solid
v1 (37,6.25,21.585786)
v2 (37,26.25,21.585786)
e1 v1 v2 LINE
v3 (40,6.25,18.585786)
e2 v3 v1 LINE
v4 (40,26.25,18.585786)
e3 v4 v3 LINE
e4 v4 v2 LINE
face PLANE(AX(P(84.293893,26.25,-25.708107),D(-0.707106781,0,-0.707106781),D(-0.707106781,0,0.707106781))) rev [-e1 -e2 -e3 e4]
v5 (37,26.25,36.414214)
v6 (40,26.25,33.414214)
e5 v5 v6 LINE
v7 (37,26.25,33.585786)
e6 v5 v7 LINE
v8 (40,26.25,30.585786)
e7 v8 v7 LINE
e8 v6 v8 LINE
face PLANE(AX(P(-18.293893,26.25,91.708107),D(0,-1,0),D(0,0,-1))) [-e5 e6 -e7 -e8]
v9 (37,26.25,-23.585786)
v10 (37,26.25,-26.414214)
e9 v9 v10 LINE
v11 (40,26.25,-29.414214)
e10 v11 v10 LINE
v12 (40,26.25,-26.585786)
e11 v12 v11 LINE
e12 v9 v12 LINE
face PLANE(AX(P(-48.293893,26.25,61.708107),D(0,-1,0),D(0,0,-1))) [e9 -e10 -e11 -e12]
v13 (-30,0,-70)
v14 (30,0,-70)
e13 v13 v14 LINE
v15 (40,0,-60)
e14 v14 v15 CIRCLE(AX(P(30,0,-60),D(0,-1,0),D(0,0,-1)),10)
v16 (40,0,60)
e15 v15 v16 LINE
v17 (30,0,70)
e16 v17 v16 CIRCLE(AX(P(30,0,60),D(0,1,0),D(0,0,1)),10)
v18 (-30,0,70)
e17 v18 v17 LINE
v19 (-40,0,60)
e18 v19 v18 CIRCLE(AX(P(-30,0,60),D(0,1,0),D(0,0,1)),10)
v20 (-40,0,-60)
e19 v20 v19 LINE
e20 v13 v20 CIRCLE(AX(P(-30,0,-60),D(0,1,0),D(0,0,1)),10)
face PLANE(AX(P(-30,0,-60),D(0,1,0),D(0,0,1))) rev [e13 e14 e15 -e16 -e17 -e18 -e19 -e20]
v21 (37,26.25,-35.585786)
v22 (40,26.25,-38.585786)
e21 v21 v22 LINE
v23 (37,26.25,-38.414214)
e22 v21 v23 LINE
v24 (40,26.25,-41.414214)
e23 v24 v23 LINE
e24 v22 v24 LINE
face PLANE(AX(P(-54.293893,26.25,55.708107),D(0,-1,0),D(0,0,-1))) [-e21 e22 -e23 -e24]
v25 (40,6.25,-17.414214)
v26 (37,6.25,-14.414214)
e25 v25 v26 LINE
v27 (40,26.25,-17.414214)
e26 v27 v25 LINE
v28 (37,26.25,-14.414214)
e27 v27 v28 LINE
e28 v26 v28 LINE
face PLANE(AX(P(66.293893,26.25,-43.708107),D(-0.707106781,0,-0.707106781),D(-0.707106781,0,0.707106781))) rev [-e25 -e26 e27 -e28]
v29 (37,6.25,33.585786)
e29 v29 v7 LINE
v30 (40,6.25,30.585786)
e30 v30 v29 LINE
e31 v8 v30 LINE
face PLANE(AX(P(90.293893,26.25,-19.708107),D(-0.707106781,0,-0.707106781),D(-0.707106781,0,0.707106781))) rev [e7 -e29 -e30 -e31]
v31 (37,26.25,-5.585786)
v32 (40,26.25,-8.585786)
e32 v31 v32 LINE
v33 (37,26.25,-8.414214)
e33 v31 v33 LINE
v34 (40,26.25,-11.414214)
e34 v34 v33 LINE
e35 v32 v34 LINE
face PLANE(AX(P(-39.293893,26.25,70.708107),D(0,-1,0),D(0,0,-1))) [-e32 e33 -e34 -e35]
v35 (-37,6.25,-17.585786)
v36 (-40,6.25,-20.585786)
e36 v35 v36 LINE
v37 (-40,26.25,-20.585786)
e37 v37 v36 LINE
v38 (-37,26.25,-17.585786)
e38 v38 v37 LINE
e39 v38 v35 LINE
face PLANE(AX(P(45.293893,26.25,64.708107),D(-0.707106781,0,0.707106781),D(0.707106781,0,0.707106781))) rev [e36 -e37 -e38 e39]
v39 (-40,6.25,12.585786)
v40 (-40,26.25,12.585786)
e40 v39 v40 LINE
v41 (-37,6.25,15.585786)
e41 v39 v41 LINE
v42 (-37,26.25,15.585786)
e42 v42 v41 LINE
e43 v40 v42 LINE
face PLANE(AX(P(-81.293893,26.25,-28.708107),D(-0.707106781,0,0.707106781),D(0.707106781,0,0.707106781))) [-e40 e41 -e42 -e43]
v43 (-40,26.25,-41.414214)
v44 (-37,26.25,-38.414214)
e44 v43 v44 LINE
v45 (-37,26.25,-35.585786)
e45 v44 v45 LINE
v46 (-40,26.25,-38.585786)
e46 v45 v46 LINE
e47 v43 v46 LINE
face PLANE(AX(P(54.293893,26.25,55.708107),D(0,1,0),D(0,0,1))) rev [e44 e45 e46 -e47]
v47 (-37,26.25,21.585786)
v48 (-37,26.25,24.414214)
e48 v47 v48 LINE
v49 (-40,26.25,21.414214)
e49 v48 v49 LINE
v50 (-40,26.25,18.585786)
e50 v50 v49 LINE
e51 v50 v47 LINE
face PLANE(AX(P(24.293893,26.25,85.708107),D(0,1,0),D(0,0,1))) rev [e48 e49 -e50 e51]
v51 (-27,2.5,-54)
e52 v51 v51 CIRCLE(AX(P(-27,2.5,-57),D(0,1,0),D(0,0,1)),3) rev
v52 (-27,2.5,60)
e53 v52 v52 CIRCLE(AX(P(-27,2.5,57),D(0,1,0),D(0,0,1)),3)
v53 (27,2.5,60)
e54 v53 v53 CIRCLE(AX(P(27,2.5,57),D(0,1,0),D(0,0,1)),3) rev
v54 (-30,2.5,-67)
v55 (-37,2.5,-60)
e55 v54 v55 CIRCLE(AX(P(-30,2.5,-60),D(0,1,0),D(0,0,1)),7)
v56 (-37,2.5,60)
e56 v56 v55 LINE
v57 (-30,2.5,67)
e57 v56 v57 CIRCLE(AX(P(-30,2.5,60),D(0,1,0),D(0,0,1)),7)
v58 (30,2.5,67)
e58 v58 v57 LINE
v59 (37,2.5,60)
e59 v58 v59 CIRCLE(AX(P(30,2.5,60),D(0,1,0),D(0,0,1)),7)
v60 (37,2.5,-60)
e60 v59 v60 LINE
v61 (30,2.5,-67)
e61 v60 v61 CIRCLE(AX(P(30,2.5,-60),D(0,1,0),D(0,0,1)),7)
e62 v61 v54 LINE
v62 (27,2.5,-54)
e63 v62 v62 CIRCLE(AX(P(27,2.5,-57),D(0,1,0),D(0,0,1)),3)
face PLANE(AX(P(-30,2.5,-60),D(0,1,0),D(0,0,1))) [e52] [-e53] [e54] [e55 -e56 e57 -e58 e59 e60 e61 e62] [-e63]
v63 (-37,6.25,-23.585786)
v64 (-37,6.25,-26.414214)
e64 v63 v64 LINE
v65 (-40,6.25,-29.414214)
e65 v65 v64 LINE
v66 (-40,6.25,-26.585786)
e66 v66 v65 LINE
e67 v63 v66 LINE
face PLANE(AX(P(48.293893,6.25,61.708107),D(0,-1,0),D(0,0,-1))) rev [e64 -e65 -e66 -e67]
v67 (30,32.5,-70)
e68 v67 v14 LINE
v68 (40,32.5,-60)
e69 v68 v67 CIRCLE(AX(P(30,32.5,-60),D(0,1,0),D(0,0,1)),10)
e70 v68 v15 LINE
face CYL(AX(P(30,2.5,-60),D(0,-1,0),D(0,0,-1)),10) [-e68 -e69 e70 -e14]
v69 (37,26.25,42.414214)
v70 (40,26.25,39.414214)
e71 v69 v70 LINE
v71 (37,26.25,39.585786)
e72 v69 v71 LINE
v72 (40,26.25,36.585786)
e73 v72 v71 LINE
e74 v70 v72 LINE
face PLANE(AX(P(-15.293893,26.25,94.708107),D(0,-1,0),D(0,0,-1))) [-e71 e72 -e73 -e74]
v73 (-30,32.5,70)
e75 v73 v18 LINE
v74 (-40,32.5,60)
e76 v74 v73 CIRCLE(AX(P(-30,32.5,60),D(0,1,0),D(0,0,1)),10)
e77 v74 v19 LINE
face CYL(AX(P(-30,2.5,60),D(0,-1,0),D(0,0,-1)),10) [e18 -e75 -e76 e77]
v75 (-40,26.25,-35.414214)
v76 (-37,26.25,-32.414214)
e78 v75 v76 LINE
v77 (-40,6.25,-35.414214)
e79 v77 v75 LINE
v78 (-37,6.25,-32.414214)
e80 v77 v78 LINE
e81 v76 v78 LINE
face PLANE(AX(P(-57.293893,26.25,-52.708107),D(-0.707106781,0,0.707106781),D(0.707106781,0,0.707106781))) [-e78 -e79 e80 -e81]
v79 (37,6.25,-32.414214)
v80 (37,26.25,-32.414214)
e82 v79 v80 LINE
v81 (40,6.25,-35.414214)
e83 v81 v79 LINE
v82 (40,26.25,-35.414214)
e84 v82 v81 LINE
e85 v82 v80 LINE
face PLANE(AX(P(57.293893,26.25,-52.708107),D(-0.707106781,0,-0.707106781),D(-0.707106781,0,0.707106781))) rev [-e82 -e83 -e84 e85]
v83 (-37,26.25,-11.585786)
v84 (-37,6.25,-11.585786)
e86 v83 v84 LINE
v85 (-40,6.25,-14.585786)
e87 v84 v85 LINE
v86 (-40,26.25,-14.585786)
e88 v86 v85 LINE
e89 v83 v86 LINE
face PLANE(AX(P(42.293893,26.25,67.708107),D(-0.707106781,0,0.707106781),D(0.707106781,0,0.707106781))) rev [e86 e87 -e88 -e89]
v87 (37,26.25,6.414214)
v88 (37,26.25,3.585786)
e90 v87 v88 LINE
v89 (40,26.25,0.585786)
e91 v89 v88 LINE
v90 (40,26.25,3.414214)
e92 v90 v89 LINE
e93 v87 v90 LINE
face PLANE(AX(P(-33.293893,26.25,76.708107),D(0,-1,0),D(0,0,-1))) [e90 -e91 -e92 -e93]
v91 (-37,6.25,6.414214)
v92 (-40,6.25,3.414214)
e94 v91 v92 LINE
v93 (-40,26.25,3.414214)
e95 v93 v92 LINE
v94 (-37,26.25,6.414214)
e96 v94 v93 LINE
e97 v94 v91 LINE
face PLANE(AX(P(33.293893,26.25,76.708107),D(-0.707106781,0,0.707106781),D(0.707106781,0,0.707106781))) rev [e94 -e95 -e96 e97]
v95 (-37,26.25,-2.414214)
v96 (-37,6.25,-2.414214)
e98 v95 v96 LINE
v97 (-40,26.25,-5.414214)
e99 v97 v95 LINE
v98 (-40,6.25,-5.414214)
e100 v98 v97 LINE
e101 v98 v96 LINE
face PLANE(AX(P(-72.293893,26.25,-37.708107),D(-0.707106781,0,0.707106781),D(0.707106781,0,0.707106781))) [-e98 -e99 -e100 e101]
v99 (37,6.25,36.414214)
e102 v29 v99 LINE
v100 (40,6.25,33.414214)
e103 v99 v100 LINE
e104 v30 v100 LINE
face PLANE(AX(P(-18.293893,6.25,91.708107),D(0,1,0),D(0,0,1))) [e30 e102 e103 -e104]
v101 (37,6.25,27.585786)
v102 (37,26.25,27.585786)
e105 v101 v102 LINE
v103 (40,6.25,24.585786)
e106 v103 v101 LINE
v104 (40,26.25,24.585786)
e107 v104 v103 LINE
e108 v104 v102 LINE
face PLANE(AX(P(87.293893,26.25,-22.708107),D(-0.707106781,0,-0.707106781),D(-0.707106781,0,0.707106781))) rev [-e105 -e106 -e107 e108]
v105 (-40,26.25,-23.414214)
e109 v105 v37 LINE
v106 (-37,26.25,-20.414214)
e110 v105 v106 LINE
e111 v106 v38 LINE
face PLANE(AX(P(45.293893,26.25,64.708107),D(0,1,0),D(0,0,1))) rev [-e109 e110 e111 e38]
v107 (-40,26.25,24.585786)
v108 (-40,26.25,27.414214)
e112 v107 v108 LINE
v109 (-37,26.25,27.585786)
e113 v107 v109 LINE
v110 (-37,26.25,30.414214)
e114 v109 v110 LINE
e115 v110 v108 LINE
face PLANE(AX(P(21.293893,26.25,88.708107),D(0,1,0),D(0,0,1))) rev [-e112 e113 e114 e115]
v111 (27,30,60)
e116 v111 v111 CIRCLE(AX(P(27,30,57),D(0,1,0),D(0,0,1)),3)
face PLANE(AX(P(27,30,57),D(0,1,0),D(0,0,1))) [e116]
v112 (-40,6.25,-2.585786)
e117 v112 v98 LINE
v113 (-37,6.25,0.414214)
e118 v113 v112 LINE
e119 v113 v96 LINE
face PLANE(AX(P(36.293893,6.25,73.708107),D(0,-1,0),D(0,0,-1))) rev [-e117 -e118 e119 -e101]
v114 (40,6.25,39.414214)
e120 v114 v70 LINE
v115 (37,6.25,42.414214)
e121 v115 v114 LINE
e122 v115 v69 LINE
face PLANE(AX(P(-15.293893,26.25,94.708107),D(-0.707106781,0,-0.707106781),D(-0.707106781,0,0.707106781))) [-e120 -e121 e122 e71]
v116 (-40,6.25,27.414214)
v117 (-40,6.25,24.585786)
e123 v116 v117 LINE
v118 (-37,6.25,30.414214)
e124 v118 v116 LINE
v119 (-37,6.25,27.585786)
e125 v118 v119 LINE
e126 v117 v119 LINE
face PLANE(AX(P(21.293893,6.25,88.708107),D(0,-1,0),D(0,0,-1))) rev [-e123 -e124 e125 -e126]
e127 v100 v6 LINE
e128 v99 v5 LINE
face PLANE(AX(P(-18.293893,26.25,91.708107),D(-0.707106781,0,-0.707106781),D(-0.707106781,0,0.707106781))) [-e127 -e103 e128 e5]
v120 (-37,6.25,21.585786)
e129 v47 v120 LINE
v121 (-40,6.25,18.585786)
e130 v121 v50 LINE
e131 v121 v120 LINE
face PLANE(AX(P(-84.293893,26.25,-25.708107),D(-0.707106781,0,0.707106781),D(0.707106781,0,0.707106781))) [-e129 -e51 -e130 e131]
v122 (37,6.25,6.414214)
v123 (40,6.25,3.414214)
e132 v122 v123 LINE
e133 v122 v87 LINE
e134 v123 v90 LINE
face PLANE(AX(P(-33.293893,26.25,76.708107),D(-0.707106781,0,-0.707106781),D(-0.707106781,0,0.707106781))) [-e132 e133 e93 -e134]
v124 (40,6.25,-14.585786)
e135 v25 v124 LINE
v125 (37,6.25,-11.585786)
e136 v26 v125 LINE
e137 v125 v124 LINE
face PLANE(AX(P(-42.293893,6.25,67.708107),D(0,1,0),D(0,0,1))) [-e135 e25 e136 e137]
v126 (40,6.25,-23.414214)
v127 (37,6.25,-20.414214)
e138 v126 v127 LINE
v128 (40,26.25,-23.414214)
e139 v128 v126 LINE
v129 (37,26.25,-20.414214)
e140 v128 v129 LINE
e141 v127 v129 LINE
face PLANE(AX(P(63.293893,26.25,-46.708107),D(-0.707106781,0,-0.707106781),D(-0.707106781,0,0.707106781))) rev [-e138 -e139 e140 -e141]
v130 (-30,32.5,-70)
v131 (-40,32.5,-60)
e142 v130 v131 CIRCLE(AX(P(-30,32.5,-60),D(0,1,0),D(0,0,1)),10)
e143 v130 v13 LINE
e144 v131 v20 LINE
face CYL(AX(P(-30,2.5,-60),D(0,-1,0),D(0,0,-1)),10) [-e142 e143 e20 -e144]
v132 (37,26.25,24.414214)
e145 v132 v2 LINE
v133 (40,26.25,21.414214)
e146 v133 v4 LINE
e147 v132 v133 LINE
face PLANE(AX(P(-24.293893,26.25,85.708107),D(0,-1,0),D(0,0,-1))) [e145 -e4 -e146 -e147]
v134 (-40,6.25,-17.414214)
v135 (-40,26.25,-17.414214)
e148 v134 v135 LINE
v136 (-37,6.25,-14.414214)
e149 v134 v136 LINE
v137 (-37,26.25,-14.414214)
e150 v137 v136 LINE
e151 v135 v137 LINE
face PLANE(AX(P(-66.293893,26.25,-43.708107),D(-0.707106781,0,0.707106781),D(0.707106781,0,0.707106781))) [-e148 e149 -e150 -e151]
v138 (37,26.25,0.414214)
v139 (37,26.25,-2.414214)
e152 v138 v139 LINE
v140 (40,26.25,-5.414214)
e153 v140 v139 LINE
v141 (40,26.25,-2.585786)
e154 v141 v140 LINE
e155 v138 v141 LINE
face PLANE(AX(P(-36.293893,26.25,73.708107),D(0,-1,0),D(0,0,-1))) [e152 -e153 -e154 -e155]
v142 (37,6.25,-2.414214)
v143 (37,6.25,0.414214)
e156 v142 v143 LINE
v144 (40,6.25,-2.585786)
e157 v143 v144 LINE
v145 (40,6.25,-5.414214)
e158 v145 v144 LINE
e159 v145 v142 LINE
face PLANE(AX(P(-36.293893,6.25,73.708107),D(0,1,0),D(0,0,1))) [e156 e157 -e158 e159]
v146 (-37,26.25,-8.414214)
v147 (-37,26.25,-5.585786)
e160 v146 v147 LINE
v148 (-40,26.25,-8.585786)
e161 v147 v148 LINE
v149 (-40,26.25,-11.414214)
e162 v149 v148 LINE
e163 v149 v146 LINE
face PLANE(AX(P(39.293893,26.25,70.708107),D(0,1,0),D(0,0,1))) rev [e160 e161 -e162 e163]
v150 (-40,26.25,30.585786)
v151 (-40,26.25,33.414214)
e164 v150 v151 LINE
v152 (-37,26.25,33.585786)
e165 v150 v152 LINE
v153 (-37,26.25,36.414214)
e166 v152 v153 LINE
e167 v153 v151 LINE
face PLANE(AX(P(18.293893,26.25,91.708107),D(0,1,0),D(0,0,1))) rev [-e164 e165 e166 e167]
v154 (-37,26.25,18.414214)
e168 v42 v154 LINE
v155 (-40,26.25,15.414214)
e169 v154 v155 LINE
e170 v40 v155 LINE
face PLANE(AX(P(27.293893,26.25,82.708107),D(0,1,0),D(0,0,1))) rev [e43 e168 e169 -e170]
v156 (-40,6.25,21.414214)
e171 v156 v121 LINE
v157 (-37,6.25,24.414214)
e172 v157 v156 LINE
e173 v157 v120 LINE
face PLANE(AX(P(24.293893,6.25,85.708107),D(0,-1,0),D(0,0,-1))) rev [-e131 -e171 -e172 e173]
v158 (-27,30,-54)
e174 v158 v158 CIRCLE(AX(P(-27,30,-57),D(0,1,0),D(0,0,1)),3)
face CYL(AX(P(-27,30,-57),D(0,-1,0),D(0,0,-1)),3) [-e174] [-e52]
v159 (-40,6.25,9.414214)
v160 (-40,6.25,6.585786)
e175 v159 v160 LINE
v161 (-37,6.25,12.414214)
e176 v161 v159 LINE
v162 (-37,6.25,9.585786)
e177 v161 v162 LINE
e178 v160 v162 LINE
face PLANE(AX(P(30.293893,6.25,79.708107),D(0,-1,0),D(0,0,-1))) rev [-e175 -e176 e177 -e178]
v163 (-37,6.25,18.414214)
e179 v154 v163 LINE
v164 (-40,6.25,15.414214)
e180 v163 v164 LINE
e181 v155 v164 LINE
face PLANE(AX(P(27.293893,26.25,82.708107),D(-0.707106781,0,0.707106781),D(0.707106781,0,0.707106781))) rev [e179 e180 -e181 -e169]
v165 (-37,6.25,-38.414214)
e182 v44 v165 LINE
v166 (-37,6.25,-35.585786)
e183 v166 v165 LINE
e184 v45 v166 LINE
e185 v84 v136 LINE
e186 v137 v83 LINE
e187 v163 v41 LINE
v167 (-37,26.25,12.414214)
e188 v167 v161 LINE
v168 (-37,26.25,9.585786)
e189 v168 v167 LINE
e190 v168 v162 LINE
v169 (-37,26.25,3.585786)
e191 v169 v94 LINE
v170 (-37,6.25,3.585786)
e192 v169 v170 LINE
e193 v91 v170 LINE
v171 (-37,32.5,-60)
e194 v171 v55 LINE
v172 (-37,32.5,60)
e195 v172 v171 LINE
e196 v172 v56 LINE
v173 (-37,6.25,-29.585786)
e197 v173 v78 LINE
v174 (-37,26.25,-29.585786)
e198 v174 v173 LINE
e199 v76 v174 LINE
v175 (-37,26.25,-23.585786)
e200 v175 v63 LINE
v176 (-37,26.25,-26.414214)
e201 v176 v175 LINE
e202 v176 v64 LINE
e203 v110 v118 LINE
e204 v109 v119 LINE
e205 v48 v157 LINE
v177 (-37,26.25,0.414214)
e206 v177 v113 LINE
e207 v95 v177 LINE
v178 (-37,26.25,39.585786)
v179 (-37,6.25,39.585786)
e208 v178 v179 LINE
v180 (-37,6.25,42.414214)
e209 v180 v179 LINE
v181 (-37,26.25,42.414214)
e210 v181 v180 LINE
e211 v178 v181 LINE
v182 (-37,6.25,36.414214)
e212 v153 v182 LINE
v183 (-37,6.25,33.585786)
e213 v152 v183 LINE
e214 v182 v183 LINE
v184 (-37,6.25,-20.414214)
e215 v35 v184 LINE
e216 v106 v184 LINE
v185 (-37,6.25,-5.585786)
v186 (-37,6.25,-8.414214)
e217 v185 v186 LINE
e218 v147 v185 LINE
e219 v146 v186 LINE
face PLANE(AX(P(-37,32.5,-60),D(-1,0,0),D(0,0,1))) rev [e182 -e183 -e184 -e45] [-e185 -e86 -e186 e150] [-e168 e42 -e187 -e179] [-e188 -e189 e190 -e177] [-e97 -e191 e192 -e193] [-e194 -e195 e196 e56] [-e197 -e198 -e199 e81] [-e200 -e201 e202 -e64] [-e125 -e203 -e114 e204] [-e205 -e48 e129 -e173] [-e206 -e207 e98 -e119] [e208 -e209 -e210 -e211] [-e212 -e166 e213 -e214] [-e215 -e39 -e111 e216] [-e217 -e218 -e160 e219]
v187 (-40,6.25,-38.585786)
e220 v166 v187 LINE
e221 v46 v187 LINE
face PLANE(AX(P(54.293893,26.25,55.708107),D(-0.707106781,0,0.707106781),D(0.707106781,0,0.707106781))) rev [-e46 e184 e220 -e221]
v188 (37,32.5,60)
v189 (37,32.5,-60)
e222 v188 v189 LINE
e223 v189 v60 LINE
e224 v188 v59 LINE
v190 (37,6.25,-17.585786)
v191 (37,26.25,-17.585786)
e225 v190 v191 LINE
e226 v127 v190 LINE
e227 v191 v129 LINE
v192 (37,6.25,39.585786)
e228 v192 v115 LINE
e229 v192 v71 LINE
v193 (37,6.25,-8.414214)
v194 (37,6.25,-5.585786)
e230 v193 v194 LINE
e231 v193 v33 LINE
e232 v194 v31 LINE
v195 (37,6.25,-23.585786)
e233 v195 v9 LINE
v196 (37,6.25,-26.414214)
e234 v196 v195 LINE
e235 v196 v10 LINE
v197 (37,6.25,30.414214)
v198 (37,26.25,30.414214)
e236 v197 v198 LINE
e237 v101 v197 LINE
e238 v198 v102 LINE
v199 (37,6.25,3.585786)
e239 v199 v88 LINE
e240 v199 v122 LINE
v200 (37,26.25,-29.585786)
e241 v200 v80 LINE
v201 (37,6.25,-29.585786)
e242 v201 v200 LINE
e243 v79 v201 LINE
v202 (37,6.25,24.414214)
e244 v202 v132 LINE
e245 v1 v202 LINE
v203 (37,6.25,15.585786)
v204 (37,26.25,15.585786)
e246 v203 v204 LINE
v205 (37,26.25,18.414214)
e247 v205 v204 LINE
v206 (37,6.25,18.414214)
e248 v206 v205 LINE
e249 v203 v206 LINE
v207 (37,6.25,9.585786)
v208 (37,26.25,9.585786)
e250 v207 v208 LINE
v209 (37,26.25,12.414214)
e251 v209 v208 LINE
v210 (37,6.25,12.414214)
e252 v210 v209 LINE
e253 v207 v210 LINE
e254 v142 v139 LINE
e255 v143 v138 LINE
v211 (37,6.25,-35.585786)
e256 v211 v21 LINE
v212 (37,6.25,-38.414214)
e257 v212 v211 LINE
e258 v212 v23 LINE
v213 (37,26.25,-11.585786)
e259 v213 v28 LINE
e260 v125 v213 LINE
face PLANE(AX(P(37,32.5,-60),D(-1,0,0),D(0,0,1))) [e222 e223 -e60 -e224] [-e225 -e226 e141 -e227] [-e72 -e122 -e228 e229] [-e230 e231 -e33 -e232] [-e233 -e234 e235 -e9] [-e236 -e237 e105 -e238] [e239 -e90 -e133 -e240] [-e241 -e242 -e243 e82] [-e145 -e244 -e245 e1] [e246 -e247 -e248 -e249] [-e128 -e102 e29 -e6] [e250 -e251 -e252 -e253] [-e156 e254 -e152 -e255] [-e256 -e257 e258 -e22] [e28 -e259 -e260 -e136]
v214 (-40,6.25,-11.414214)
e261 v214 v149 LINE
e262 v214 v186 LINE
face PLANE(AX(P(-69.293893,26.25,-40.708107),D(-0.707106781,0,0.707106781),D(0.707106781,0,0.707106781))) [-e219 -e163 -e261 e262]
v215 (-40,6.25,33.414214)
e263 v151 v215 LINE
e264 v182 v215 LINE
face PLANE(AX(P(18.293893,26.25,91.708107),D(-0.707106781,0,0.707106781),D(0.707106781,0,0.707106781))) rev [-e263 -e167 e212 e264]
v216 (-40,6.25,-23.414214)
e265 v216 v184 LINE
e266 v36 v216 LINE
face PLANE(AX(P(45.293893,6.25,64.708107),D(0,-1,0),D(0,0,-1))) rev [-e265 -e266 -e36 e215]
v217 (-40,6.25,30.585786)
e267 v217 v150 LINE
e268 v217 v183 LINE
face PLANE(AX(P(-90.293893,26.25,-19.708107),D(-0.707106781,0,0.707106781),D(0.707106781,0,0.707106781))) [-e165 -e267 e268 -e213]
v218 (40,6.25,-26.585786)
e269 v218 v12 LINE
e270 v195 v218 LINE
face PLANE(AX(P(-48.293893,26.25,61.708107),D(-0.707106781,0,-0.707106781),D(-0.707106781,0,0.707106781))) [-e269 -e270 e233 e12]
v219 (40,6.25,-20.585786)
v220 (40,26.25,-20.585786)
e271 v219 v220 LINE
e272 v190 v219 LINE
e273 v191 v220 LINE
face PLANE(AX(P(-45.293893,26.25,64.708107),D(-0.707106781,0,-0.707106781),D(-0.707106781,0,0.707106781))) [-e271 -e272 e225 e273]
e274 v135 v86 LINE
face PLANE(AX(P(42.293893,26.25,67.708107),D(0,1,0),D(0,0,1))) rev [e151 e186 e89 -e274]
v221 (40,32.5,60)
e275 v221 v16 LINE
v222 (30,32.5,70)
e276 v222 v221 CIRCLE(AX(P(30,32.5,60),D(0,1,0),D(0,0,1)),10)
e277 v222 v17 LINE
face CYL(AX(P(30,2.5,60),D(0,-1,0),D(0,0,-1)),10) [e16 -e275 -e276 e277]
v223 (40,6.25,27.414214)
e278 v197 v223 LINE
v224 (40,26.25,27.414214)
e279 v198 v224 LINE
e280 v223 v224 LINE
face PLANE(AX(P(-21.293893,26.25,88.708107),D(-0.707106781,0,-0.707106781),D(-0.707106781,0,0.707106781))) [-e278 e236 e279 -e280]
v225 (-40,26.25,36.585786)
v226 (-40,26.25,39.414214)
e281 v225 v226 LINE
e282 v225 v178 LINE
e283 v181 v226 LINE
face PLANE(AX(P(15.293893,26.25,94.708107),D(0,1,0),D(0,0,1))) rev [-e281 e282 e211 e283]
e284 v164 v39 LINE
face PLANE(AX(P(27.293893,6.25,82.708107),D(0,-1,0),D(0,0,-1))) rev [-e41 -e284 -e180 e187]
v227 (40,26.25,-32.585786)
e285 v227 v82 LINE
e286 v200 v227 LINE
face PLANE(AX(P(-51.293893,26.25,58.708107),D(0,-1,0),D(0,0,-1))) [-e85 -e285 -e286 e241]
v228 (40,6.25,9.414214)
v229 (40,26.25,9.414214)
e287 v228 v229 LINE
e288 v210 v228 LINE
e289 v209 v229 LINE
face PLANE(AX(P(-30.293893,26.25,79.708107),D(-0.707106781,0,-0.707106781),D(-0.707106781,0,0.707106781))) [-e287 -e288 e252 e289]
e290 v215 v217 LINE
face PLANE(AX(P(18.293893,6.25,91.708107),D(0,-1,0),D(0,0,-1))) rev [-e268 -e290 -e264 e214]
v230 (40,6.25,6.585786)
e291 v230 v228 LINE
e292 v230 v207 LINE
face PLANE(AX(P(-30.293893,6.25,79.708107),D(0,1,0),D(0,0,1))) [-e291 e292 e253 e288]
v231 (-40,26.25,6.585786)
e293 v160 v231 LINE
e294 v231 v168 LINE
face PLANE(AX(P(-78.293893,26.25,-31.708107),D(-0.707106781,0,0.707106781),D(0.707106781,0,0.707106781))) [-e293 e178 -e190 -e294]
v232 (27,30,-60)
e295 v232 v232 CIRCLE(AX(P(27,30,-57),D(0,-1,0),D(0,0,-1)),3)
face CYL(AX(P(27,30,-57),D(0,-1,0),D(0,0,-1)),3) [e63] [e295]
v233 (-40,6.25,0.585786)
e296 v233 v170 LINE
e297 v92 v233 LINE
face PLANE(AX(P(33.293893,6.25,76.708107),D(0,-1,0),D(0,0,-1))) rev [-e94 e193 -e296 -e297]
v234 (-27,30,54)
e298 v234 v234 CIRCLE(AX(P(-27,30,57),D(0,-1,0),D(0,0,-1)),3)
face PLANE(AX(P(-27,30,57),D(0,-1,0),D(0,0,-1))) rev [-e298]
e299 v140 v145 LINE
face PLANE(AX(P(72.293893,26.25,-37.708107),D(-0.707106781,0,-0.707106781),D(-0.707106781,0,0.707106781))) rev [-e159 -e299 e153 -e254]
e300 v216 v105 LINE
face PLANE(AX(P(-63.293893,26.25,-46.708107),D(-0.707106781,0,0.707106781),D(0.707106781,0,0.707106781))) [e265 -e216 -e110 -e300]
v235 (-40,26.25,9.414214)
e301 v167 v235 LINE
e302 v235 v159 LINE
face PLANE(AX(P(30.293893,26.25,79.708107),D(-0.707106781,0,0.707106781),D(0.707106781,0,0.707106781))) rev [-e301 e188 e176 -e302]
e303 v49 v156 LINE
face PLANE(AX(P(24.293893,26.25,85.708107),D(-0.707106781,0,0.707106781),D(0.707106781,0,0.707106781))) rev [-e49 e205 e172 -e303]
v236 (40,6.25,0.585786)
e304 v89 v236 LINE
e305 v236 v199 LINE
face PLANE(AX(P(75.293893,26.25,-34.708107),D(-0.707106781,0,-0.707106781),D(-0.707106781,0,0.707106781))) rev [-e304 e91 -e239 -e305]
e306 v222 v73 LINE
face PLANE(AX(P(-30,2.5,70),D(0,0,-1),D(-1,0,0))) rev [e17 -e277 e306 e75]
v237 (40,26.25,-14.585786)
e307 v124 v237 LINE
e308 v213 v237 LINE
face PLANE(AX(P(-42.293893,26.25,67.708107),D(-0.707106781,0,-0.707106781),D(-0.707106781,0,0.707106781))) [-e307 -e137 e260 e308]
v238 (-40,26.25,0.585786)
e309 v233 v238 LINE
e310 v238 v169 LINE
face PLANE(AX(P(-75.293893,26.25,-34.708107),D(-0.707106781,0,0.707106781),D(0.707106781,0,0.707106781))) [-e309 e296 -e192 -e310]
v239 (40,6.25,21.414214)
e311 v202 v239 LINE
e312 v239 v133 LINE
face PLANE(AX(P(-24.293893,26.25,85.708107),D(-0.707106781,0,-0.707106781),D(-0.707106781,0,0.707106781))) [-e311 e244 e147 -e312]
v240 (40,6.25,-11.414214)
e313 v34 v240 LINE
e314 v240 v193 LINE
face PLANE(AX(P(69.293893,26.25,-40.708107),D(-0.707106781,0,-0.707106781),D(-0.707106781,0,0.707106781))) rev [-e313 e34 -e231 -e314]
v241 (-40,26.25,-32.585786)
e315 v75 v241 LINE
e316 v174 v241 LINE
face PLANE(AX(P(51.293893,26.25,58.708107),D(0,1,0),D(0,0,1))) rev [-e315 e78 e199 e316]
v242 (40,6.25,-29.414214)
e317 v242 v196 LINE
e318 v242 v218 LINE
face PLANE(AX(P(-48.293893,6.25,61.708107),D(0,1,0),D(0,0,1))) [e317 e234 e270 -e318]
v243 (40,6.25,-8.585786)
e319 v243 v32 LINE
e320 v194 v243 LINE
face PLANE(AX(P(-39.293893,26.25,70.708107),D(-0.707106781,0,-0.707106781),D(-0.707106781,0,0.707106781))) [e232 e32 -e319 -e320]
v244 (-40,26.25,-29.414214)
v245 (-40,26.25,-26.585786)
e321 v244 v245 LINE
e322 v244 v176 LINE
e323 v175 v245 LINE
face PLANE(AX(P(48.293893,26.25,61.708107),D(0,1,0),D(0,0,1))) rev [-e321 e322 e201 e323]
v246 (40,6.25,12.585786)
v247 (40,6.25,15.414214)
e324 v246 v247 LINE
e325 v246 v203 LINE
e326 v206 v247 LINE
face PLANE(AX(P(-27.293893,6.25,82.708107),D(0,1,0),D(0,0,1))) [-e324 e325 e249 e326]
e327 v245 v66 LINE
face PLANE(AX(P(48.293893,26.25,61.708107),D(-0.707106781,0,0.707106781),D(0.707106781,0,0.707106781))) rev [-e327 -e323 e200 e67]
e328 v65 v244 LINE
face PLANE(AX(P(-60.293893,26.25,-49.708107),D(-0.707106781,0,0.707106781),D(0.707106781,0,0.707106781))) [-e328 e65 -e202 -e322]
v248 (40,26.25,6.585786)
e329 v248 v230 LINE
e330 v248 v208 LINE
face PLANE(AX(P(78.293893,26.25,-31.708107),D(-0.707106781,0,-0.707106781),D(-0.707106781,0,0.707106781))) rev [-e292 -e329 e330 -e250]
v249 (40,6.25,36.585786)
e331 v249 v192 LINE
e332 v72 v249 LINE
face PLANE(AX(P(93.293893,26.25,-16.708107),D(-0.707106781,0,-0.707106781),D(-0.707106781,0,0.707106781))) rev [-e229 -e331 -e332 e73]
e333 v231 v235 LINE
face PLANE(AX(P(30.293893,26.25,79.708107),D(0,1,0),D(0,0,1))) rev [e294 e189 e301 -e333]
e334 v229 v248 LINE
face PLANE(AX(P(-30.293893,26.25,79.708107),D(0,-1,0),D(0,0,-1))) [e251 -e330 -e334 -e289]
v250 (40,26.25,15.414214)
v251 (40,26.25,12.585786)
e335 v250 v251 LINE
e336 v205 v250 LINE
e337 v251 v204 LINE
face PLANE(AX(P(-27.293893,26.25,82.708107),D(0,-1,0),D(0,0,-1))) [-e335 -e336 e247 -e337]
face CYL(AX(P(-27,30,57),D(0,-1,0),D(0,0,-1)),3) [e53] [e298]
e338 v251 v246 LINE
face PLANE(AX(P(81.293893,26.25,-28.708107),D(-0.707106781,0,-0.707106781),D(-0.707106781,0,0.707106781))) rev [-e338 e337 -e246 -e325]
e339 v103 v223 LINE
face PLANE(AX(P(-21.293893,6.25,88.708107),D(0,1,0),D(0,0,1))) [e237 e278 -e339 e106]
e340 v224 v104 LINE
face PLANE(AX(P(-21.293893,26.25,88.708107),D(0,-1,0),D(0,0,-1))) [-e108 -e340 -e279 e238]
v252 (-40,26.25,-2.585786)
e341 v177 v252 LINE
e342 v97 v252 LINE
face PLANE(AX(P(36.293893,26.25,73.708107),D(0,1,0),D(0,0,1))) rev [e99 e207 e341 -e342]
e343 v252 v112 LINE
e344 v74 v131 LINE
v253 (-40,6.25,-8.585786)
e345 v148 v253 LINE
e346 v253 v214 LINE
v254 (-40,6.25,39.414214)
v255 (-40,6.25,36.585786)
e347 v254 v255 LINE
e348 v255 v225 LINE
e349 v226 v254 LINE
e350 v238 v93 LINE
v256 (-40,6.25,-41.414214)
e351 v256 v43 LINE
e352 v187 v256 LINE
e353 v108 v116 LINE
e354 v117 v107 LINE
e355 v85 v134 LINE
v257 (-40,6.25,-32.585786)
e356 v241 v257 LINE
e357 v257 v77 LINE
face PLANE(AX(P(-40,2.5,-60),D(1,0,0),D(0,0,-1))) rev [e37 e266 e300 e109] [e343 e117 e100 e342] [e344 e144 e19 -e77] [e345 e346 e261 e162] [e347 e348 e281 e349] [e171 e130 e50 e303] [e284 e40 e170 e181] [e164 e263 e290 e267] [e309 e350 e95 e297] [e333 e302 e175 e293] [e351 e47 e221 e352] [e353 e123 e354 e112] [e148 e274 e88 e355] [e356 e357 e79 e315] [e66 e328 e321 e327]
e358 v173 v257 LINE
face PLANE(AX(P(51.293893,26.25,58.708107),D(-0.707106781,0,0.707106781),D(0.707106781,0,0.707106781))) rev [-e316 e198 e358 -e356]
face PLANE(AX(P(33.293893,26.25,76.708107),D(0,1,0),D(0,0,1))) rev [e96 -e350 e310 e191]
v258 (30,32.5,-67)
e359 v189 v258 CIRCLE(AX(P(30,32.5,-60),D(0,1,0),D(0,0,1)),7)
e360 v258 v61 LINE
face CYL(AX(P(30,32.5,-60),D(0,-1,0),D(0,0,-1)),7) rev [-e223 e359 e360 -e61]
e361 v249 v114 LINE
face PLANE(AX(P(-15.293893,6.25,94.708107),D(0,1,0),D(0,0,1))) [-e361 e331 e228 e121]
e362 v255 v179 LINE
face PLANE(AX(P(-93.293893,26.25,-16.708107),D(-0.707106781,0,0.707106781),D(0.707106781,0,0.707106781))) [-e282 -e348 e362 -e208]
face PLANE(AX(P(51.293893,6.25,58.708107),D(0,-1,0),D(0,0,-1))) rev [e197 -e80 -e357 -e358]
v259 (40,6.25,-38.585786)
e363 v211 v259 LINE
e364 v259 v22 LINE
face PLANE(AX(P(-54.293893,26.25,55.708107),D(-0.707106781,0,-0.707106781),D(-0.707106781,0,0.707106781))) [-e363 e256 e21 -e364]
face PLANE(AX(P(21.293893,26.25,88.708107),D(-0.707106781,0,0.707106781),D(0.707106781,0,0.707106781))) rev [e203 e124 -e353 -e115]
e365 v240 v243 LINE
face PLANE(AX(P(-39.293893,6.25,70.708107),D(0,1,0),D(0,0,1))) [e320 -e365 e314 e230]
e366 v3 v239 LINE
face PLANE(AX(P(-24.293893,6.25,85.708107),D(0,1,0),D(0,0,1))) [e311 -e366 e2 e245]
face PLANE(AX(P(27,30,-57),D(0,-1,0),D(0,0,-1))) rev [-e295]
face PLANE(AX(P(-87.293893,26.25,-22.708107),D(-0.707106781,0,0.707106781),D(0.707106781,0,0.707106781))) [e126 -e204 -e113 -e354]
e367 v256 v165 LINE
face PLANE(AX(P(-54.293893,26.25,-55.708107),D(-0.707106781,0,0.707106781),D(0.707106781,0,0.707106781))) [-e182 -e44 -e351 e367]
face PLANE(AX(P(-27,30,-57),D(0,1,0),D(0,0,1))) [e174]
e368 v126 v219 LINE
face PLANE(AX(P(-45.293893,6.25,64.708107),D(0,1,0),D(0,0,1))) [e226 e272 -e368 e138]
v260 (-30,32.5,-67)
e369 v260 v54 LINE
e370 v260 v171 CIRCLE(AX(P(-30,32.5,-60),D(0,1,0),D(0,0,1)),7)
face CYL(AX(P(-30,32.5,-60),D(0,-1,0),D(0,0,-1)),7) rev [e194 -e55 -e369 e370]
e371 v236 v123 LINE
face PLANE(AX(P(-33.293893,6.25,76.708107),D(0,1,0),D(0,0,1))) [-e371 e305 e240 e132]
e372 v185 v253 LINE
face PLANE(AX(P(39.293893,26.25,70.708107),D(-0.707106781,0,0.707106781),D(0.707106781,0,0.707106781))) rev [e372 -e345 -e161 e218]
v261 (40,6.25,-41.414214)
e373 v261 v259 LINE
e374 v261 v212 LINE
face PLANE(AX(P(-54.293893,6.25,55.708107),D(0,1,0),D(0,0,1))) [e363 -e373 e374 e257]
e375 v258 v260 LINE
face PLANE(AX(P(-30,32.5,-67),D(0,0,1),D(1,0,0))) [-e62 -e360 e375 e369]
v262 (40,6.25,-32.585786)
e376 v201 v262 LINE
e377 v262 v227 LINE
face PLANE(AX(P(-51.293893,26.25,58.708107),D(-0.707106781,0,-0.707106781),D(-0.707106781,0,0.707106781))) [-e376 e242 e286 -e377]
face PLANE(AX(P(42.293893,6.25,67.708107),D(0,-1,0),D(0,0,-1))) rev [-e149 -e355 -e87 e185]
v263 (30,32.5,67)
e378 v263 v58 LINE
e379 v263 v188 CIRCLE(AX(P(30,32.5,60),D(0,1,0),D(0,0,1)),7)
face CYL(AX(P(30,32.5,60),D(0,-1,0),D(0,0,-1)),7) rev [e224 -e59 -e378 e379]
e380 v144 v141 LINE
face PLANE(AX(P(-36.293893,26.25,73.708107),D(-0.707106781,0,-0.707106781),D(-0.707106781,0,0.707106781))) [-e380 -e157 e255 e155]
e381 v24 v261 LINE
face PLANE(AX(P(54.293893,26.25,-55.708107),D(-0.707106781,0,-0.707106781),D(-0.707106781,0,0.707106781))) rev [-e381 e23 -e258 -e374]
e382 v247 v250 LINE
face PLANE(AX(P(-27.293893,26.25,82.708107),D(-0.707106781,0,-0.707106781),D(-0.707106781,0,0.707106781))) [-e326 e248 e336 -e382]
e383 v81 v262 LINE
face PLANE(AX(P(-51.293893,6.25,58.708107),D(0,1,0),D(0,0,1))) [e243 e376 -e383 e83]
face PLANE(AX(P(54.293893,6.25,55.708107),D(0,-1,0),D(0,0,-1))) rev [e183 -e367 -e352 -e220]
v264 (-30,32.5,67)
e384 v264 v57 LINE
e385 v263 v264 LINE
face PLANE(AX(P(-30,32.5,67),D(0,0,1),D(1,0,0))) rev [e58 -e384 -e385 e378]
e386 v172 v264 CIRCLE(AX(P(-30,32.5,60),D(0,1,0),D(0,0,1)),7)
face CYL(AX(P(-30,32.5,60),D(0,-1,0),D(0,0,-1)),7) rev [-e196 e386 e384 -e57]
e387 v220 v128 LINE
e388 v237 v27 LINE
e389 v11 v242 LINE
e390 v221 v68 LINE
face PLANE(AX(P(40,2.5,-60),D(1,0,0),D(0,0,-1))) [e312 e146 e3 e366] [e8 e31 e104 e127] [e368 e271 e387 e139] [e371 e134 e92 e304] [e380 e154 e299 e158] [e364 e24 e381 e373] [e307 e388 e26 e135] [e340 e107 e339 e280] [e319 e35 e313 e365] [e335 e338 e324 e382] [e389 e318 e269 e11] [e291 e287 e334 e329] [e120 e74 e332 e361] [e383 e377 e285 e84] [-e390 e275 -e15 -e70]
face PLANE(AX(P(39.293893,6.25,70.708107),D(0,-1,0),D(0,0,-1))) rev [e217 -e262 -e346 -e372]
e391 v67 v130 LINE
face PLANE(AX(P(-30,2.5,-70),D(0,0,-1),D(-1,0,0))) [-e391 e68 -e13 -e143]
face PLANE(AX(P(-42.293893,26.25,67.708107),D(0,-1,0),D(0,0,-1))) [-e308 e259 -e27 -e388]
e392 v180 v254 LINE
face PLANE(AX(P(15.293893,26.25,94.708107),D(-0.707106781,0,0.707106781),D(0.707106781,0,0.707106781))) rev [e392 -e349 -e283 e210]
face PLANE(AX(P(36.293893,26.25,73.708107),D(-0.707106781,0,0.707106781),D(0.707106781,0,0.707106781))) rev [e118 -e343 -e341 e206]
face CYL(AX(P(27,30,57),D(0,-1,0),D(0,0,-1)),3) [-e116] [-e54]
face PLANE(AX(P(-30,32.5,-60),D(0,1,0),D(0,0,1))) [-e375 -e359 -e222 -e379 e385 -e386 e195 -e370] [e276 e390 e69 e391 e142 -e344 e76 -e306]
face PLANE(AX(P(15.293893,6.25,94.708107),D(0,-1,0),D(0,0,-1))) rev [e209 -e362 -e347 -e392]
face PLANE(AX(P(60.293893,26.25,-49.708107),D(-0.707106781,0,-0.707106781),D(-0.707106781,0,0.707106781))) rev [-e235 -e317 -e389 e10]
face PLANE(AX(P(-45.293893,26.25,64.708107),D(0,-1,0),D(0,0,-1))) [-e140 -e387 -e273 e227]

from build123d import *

# Parameters (mm, degrees)
BOSS_EXTRUDE1_DEPTH            = 2.5
BOSS_EXTRUDE2_START            = 2.5
BOSS_EXTRUDE2_DEPTH            = 30
SKETCH1_5_R                    = 3
BOSS_EXTRUDE4_DEPTH            = 30
CUT_EXTRUDE3_REACH             = 134.823
SKETCH8_W                      = 2
SKETCH8_H                      = 20
CUT_EXTRUDE3_DIRECTION_2_REACH = 134.823
LPATTERN1_START                = 6.25
LPATTERN1_DEPTH                = 20


# Read off the part's stored shape, not the designer's step: LPattern1
with BuildPart() as part:
    # Sketch1 → Boss-Extrude1 (new body)
    with BuildSketch(Plane(origin=(0, 0, 0), x_dir=(1, 0, 0), z_dir=(0, 1, 0))):
        with BuildLine():
            Line((-30, 70), (30, 70))
            ThreePointArc((30, 70), (37.071067812, 67.071067812), (40, 60))
            Line((40, 60), (40, -60))
            ThreePointArc((40, -60), (37.071067812, -67.071067812), (30, -70))
            Line((30, -70), (-30, -70))
            ThreePointArc((-30, -70), (-37.071067812, -67.071067812), (-40, -60))
            Line((-40, -60), (-40, 60))
            ThreePointArc((-40, 60), (-37.071067812, 67.071067812), (-30, 70))
        make_face()
    extrude(amount=BOSS_EXTRUDE1_DEPTH)

    # Sketch1<3> → Boss-Extrude2 (add)
    with BuildSketch(Plane(origin=(0, 0, 0), x_dir=(1, 0, 0), z_dir=(0, 1, 0)).offset(BOSS_EXTRUDE2_START)):
        with BuildLine():
            Line((-30, 70), (30, 70))
            ThreePointArc((30, 70), (37.071067812, 67.071067812), (40, 60))
            Line((40, 60), (40, -60))
            ThreePointArc((40, -60), (37.071067812, -67.071067812), (30, -70))
            Line((30, -70), (-30, -70))
            ThreePointArc((-30, -70), (-37.071067812, -67.071067812), (-40, -60))
            Line((-40, -60), (-40, 60))
            ThreePointArc((-40, 60), (-37.071067812, 67.071067812), (-30, 70))
        make_face()
        with BuildLine():
            Line((-37, 60), (-37, -60))
            ThreePointArc((-37, -60), (-34.949747468, -64.949747468), (-30, -67))
            Line((-30, -67), (30, -67))
            ThreePointArc((30, -67), (34.949747468, -64.949747468), (37, -60))
            Line((37, -60), (37, 60))
            ThreePointArc((37, 60), (34.949747468, 64.949747468), (30, 67))
            Line((30, 67), (-30, 67))
            ThreePointArc((-30, 67), (-34.949747468, 64.949747468), (-37, 60))
        make_face(mode=Mode.SUBTRACT)
    extrude(amount=BOSS_EXTRUDE2_DEPTH)

    # Sketch1<5> → Boss-Extrude4 (add)
    with BuildSketch(Plane(origin=(0, 0, 0), x_dir=(1, 0, 0), z_dir=(0, 1, 0))):
        with Locations(Location((27, -57, 0), (0, 0, 270))):
            Circle(SKETCH1_5_R)
        with Locations(Location((-27, -57, 0), (0, 0, 90))):
            Circle(SKETCH1_5_R)
        with Locations(Location((-27, 57, 0), (0, 0, 270))):
            Circle(SKETCH1_5_R)
        with Locations(Location((27, 57, 0), (0, 0, 90))):
            Circle(SKETCH1_5_R)
    extrude(amount=BOSS_EXTRUDE4_DEPTH)

    # Sketch8 → Cut-Extrude3 (cut, up to next)
    with BuildSketch(Plane(origin=(37, 16.25, -37), x_dir=(0.7071067811865538, 0, 0.7071067811865412), z_dir=(-0.7071067811865412, 0, 0.7071067811865538)), mode=Mode.PRIVATE) as cut_extrude3_sk1:
        Rectangle(SKETCH8_W, SKETCH8_H)
    cut_extrude3_tool1 = extrude(cut_extrude3_sk1.sketch, amount=-CUT_EXTRUDE3_REACH, mode=Mode.PRIVATE) & part.part
    cut_extrude3 = cut_extrude3_tool1.solids().sort_by_distance((37, 16.25, -37))[0]
    add(cut_extrude3, mode=Mode.SUBTRACT)

    # Sketch8 → Cut-Extrude3 direction 2 (cut, up to next)
    with BuildSketch(Plane(origin=(37, 16.25, -37), x_dir=(0.7071067811865538, 0, 0.7071067811865412), z_dir=(-0.7071067811865412, 0, 0.7071067811865538)), mode=Mode.PRIVATE) as cut_extrude3_direction_2_sk1:
        Rectangle(SKETCH8_W, SKETCH8_H)
    cut_extrude3_direction_2_tool1 = extrude(cut_extrude3_direction_2_sk1.sketch, amount=CUT_EXTRUDE3_DIRECTION_2_REACH, mode=Mode.PRIVATE) & part.part
    cut_extrude3_direction_2 = cut_extrude3_direction_2_tool1.solids().sort_by_distance((37, 16.25, -37))[0]
    add(cut_extrude3_direction_2, mode=Mode.SUBTRACT)

    # LPattern1 outline → LPattern1 (cut)
    with BuildSketch(Plane(origin=(0, 0, 0), x_dir=(1, 0, 0), z_dir=(0, 1, 0)).offset(LPATTERN1_START)):
        Polygon((37, -42.414213562), (40, -39.414213562), (40, -36.585786438), (37, -39.585786438), align=None)
        Polygon((37, -36.414213562), (40, -33.414213562), (40, -30.585786438), (37, -33.585786438), align=None)
        Polygon((37, -30.414213562), (40, -27.414213562), (40, -24.585786438), (37, -27.585786438), align=None)
        Polygon((37, -24.414213562), (40, -21.414213562), (40, -18.585786438), (37, -21.585786438), align=None)
        Polygon((37, -18.414213562), (40, -15.414213562), (40, -12.585786438), (37, -15.585786438), align=None)
        Polygon((37, -12.414213562), (40, -9.414213562), (40, -6.585786438), (37, -9.585786438), align=None)
        Polygon((37, -6.414213562), (40, -3.414213562), (40, -0.585786438), (37, -3.585786438), align=None)
        Polygon((37, -0.414213562), (40, 2.585786438), (40, 5.414213562), (37, 2.414213562), align=None)
        Polygon((37, 5.585786438), (40, 8.585786438), (40, 11.414213562), (37, 8.414213562), align=None)
        Polygon((37, 11.585786438), (40, 14.585786438), (40, 17.414213562), (37, 14.414213562), align=None)
        Polygon((37, 17.585786438), (40, 20.585786438), (40, 23.414213562), (37, 20.414213562), align=None)
        Polygon((37, 23.585786438), (40, 26.585786438), (40, 29.414213562), (37, 26.414213562), align=None)
        Polygon((37, 29.585786438), (40, 32.585786438), (40, 35.414213562), (37, 32.414213562), align=None)
    lpattern1 = extrude(amount=LPATTERN1_DEPTH, mode=Mode.SUBTRACT)

    # Mirror2: Cut-Extrude3, Cut-Extrude3 direction 2, LPattern1 across plane
    add(cut_extrude3.mirror(Plane(origin=(0, 0, 0), x_dir=(0, 0, 1), z_dir=(1, 0, 0))), mode=Mode.SUBTRACT)
    add(cut_extrude3_direction_2.mirror(Plane(origin=(0, 0, 0), x_dir=(0, 0, 1), z_dir=(1, 0, 0))), mode=Mode.SUBTRACT)
    add(lpattern1.mirror(Plane(origin=(0, 0, 0), x_dir=(0, 0, 1), z_dir=(1, 0, 0))), mode=Mode.SUBTRACT)


solid = part.part
